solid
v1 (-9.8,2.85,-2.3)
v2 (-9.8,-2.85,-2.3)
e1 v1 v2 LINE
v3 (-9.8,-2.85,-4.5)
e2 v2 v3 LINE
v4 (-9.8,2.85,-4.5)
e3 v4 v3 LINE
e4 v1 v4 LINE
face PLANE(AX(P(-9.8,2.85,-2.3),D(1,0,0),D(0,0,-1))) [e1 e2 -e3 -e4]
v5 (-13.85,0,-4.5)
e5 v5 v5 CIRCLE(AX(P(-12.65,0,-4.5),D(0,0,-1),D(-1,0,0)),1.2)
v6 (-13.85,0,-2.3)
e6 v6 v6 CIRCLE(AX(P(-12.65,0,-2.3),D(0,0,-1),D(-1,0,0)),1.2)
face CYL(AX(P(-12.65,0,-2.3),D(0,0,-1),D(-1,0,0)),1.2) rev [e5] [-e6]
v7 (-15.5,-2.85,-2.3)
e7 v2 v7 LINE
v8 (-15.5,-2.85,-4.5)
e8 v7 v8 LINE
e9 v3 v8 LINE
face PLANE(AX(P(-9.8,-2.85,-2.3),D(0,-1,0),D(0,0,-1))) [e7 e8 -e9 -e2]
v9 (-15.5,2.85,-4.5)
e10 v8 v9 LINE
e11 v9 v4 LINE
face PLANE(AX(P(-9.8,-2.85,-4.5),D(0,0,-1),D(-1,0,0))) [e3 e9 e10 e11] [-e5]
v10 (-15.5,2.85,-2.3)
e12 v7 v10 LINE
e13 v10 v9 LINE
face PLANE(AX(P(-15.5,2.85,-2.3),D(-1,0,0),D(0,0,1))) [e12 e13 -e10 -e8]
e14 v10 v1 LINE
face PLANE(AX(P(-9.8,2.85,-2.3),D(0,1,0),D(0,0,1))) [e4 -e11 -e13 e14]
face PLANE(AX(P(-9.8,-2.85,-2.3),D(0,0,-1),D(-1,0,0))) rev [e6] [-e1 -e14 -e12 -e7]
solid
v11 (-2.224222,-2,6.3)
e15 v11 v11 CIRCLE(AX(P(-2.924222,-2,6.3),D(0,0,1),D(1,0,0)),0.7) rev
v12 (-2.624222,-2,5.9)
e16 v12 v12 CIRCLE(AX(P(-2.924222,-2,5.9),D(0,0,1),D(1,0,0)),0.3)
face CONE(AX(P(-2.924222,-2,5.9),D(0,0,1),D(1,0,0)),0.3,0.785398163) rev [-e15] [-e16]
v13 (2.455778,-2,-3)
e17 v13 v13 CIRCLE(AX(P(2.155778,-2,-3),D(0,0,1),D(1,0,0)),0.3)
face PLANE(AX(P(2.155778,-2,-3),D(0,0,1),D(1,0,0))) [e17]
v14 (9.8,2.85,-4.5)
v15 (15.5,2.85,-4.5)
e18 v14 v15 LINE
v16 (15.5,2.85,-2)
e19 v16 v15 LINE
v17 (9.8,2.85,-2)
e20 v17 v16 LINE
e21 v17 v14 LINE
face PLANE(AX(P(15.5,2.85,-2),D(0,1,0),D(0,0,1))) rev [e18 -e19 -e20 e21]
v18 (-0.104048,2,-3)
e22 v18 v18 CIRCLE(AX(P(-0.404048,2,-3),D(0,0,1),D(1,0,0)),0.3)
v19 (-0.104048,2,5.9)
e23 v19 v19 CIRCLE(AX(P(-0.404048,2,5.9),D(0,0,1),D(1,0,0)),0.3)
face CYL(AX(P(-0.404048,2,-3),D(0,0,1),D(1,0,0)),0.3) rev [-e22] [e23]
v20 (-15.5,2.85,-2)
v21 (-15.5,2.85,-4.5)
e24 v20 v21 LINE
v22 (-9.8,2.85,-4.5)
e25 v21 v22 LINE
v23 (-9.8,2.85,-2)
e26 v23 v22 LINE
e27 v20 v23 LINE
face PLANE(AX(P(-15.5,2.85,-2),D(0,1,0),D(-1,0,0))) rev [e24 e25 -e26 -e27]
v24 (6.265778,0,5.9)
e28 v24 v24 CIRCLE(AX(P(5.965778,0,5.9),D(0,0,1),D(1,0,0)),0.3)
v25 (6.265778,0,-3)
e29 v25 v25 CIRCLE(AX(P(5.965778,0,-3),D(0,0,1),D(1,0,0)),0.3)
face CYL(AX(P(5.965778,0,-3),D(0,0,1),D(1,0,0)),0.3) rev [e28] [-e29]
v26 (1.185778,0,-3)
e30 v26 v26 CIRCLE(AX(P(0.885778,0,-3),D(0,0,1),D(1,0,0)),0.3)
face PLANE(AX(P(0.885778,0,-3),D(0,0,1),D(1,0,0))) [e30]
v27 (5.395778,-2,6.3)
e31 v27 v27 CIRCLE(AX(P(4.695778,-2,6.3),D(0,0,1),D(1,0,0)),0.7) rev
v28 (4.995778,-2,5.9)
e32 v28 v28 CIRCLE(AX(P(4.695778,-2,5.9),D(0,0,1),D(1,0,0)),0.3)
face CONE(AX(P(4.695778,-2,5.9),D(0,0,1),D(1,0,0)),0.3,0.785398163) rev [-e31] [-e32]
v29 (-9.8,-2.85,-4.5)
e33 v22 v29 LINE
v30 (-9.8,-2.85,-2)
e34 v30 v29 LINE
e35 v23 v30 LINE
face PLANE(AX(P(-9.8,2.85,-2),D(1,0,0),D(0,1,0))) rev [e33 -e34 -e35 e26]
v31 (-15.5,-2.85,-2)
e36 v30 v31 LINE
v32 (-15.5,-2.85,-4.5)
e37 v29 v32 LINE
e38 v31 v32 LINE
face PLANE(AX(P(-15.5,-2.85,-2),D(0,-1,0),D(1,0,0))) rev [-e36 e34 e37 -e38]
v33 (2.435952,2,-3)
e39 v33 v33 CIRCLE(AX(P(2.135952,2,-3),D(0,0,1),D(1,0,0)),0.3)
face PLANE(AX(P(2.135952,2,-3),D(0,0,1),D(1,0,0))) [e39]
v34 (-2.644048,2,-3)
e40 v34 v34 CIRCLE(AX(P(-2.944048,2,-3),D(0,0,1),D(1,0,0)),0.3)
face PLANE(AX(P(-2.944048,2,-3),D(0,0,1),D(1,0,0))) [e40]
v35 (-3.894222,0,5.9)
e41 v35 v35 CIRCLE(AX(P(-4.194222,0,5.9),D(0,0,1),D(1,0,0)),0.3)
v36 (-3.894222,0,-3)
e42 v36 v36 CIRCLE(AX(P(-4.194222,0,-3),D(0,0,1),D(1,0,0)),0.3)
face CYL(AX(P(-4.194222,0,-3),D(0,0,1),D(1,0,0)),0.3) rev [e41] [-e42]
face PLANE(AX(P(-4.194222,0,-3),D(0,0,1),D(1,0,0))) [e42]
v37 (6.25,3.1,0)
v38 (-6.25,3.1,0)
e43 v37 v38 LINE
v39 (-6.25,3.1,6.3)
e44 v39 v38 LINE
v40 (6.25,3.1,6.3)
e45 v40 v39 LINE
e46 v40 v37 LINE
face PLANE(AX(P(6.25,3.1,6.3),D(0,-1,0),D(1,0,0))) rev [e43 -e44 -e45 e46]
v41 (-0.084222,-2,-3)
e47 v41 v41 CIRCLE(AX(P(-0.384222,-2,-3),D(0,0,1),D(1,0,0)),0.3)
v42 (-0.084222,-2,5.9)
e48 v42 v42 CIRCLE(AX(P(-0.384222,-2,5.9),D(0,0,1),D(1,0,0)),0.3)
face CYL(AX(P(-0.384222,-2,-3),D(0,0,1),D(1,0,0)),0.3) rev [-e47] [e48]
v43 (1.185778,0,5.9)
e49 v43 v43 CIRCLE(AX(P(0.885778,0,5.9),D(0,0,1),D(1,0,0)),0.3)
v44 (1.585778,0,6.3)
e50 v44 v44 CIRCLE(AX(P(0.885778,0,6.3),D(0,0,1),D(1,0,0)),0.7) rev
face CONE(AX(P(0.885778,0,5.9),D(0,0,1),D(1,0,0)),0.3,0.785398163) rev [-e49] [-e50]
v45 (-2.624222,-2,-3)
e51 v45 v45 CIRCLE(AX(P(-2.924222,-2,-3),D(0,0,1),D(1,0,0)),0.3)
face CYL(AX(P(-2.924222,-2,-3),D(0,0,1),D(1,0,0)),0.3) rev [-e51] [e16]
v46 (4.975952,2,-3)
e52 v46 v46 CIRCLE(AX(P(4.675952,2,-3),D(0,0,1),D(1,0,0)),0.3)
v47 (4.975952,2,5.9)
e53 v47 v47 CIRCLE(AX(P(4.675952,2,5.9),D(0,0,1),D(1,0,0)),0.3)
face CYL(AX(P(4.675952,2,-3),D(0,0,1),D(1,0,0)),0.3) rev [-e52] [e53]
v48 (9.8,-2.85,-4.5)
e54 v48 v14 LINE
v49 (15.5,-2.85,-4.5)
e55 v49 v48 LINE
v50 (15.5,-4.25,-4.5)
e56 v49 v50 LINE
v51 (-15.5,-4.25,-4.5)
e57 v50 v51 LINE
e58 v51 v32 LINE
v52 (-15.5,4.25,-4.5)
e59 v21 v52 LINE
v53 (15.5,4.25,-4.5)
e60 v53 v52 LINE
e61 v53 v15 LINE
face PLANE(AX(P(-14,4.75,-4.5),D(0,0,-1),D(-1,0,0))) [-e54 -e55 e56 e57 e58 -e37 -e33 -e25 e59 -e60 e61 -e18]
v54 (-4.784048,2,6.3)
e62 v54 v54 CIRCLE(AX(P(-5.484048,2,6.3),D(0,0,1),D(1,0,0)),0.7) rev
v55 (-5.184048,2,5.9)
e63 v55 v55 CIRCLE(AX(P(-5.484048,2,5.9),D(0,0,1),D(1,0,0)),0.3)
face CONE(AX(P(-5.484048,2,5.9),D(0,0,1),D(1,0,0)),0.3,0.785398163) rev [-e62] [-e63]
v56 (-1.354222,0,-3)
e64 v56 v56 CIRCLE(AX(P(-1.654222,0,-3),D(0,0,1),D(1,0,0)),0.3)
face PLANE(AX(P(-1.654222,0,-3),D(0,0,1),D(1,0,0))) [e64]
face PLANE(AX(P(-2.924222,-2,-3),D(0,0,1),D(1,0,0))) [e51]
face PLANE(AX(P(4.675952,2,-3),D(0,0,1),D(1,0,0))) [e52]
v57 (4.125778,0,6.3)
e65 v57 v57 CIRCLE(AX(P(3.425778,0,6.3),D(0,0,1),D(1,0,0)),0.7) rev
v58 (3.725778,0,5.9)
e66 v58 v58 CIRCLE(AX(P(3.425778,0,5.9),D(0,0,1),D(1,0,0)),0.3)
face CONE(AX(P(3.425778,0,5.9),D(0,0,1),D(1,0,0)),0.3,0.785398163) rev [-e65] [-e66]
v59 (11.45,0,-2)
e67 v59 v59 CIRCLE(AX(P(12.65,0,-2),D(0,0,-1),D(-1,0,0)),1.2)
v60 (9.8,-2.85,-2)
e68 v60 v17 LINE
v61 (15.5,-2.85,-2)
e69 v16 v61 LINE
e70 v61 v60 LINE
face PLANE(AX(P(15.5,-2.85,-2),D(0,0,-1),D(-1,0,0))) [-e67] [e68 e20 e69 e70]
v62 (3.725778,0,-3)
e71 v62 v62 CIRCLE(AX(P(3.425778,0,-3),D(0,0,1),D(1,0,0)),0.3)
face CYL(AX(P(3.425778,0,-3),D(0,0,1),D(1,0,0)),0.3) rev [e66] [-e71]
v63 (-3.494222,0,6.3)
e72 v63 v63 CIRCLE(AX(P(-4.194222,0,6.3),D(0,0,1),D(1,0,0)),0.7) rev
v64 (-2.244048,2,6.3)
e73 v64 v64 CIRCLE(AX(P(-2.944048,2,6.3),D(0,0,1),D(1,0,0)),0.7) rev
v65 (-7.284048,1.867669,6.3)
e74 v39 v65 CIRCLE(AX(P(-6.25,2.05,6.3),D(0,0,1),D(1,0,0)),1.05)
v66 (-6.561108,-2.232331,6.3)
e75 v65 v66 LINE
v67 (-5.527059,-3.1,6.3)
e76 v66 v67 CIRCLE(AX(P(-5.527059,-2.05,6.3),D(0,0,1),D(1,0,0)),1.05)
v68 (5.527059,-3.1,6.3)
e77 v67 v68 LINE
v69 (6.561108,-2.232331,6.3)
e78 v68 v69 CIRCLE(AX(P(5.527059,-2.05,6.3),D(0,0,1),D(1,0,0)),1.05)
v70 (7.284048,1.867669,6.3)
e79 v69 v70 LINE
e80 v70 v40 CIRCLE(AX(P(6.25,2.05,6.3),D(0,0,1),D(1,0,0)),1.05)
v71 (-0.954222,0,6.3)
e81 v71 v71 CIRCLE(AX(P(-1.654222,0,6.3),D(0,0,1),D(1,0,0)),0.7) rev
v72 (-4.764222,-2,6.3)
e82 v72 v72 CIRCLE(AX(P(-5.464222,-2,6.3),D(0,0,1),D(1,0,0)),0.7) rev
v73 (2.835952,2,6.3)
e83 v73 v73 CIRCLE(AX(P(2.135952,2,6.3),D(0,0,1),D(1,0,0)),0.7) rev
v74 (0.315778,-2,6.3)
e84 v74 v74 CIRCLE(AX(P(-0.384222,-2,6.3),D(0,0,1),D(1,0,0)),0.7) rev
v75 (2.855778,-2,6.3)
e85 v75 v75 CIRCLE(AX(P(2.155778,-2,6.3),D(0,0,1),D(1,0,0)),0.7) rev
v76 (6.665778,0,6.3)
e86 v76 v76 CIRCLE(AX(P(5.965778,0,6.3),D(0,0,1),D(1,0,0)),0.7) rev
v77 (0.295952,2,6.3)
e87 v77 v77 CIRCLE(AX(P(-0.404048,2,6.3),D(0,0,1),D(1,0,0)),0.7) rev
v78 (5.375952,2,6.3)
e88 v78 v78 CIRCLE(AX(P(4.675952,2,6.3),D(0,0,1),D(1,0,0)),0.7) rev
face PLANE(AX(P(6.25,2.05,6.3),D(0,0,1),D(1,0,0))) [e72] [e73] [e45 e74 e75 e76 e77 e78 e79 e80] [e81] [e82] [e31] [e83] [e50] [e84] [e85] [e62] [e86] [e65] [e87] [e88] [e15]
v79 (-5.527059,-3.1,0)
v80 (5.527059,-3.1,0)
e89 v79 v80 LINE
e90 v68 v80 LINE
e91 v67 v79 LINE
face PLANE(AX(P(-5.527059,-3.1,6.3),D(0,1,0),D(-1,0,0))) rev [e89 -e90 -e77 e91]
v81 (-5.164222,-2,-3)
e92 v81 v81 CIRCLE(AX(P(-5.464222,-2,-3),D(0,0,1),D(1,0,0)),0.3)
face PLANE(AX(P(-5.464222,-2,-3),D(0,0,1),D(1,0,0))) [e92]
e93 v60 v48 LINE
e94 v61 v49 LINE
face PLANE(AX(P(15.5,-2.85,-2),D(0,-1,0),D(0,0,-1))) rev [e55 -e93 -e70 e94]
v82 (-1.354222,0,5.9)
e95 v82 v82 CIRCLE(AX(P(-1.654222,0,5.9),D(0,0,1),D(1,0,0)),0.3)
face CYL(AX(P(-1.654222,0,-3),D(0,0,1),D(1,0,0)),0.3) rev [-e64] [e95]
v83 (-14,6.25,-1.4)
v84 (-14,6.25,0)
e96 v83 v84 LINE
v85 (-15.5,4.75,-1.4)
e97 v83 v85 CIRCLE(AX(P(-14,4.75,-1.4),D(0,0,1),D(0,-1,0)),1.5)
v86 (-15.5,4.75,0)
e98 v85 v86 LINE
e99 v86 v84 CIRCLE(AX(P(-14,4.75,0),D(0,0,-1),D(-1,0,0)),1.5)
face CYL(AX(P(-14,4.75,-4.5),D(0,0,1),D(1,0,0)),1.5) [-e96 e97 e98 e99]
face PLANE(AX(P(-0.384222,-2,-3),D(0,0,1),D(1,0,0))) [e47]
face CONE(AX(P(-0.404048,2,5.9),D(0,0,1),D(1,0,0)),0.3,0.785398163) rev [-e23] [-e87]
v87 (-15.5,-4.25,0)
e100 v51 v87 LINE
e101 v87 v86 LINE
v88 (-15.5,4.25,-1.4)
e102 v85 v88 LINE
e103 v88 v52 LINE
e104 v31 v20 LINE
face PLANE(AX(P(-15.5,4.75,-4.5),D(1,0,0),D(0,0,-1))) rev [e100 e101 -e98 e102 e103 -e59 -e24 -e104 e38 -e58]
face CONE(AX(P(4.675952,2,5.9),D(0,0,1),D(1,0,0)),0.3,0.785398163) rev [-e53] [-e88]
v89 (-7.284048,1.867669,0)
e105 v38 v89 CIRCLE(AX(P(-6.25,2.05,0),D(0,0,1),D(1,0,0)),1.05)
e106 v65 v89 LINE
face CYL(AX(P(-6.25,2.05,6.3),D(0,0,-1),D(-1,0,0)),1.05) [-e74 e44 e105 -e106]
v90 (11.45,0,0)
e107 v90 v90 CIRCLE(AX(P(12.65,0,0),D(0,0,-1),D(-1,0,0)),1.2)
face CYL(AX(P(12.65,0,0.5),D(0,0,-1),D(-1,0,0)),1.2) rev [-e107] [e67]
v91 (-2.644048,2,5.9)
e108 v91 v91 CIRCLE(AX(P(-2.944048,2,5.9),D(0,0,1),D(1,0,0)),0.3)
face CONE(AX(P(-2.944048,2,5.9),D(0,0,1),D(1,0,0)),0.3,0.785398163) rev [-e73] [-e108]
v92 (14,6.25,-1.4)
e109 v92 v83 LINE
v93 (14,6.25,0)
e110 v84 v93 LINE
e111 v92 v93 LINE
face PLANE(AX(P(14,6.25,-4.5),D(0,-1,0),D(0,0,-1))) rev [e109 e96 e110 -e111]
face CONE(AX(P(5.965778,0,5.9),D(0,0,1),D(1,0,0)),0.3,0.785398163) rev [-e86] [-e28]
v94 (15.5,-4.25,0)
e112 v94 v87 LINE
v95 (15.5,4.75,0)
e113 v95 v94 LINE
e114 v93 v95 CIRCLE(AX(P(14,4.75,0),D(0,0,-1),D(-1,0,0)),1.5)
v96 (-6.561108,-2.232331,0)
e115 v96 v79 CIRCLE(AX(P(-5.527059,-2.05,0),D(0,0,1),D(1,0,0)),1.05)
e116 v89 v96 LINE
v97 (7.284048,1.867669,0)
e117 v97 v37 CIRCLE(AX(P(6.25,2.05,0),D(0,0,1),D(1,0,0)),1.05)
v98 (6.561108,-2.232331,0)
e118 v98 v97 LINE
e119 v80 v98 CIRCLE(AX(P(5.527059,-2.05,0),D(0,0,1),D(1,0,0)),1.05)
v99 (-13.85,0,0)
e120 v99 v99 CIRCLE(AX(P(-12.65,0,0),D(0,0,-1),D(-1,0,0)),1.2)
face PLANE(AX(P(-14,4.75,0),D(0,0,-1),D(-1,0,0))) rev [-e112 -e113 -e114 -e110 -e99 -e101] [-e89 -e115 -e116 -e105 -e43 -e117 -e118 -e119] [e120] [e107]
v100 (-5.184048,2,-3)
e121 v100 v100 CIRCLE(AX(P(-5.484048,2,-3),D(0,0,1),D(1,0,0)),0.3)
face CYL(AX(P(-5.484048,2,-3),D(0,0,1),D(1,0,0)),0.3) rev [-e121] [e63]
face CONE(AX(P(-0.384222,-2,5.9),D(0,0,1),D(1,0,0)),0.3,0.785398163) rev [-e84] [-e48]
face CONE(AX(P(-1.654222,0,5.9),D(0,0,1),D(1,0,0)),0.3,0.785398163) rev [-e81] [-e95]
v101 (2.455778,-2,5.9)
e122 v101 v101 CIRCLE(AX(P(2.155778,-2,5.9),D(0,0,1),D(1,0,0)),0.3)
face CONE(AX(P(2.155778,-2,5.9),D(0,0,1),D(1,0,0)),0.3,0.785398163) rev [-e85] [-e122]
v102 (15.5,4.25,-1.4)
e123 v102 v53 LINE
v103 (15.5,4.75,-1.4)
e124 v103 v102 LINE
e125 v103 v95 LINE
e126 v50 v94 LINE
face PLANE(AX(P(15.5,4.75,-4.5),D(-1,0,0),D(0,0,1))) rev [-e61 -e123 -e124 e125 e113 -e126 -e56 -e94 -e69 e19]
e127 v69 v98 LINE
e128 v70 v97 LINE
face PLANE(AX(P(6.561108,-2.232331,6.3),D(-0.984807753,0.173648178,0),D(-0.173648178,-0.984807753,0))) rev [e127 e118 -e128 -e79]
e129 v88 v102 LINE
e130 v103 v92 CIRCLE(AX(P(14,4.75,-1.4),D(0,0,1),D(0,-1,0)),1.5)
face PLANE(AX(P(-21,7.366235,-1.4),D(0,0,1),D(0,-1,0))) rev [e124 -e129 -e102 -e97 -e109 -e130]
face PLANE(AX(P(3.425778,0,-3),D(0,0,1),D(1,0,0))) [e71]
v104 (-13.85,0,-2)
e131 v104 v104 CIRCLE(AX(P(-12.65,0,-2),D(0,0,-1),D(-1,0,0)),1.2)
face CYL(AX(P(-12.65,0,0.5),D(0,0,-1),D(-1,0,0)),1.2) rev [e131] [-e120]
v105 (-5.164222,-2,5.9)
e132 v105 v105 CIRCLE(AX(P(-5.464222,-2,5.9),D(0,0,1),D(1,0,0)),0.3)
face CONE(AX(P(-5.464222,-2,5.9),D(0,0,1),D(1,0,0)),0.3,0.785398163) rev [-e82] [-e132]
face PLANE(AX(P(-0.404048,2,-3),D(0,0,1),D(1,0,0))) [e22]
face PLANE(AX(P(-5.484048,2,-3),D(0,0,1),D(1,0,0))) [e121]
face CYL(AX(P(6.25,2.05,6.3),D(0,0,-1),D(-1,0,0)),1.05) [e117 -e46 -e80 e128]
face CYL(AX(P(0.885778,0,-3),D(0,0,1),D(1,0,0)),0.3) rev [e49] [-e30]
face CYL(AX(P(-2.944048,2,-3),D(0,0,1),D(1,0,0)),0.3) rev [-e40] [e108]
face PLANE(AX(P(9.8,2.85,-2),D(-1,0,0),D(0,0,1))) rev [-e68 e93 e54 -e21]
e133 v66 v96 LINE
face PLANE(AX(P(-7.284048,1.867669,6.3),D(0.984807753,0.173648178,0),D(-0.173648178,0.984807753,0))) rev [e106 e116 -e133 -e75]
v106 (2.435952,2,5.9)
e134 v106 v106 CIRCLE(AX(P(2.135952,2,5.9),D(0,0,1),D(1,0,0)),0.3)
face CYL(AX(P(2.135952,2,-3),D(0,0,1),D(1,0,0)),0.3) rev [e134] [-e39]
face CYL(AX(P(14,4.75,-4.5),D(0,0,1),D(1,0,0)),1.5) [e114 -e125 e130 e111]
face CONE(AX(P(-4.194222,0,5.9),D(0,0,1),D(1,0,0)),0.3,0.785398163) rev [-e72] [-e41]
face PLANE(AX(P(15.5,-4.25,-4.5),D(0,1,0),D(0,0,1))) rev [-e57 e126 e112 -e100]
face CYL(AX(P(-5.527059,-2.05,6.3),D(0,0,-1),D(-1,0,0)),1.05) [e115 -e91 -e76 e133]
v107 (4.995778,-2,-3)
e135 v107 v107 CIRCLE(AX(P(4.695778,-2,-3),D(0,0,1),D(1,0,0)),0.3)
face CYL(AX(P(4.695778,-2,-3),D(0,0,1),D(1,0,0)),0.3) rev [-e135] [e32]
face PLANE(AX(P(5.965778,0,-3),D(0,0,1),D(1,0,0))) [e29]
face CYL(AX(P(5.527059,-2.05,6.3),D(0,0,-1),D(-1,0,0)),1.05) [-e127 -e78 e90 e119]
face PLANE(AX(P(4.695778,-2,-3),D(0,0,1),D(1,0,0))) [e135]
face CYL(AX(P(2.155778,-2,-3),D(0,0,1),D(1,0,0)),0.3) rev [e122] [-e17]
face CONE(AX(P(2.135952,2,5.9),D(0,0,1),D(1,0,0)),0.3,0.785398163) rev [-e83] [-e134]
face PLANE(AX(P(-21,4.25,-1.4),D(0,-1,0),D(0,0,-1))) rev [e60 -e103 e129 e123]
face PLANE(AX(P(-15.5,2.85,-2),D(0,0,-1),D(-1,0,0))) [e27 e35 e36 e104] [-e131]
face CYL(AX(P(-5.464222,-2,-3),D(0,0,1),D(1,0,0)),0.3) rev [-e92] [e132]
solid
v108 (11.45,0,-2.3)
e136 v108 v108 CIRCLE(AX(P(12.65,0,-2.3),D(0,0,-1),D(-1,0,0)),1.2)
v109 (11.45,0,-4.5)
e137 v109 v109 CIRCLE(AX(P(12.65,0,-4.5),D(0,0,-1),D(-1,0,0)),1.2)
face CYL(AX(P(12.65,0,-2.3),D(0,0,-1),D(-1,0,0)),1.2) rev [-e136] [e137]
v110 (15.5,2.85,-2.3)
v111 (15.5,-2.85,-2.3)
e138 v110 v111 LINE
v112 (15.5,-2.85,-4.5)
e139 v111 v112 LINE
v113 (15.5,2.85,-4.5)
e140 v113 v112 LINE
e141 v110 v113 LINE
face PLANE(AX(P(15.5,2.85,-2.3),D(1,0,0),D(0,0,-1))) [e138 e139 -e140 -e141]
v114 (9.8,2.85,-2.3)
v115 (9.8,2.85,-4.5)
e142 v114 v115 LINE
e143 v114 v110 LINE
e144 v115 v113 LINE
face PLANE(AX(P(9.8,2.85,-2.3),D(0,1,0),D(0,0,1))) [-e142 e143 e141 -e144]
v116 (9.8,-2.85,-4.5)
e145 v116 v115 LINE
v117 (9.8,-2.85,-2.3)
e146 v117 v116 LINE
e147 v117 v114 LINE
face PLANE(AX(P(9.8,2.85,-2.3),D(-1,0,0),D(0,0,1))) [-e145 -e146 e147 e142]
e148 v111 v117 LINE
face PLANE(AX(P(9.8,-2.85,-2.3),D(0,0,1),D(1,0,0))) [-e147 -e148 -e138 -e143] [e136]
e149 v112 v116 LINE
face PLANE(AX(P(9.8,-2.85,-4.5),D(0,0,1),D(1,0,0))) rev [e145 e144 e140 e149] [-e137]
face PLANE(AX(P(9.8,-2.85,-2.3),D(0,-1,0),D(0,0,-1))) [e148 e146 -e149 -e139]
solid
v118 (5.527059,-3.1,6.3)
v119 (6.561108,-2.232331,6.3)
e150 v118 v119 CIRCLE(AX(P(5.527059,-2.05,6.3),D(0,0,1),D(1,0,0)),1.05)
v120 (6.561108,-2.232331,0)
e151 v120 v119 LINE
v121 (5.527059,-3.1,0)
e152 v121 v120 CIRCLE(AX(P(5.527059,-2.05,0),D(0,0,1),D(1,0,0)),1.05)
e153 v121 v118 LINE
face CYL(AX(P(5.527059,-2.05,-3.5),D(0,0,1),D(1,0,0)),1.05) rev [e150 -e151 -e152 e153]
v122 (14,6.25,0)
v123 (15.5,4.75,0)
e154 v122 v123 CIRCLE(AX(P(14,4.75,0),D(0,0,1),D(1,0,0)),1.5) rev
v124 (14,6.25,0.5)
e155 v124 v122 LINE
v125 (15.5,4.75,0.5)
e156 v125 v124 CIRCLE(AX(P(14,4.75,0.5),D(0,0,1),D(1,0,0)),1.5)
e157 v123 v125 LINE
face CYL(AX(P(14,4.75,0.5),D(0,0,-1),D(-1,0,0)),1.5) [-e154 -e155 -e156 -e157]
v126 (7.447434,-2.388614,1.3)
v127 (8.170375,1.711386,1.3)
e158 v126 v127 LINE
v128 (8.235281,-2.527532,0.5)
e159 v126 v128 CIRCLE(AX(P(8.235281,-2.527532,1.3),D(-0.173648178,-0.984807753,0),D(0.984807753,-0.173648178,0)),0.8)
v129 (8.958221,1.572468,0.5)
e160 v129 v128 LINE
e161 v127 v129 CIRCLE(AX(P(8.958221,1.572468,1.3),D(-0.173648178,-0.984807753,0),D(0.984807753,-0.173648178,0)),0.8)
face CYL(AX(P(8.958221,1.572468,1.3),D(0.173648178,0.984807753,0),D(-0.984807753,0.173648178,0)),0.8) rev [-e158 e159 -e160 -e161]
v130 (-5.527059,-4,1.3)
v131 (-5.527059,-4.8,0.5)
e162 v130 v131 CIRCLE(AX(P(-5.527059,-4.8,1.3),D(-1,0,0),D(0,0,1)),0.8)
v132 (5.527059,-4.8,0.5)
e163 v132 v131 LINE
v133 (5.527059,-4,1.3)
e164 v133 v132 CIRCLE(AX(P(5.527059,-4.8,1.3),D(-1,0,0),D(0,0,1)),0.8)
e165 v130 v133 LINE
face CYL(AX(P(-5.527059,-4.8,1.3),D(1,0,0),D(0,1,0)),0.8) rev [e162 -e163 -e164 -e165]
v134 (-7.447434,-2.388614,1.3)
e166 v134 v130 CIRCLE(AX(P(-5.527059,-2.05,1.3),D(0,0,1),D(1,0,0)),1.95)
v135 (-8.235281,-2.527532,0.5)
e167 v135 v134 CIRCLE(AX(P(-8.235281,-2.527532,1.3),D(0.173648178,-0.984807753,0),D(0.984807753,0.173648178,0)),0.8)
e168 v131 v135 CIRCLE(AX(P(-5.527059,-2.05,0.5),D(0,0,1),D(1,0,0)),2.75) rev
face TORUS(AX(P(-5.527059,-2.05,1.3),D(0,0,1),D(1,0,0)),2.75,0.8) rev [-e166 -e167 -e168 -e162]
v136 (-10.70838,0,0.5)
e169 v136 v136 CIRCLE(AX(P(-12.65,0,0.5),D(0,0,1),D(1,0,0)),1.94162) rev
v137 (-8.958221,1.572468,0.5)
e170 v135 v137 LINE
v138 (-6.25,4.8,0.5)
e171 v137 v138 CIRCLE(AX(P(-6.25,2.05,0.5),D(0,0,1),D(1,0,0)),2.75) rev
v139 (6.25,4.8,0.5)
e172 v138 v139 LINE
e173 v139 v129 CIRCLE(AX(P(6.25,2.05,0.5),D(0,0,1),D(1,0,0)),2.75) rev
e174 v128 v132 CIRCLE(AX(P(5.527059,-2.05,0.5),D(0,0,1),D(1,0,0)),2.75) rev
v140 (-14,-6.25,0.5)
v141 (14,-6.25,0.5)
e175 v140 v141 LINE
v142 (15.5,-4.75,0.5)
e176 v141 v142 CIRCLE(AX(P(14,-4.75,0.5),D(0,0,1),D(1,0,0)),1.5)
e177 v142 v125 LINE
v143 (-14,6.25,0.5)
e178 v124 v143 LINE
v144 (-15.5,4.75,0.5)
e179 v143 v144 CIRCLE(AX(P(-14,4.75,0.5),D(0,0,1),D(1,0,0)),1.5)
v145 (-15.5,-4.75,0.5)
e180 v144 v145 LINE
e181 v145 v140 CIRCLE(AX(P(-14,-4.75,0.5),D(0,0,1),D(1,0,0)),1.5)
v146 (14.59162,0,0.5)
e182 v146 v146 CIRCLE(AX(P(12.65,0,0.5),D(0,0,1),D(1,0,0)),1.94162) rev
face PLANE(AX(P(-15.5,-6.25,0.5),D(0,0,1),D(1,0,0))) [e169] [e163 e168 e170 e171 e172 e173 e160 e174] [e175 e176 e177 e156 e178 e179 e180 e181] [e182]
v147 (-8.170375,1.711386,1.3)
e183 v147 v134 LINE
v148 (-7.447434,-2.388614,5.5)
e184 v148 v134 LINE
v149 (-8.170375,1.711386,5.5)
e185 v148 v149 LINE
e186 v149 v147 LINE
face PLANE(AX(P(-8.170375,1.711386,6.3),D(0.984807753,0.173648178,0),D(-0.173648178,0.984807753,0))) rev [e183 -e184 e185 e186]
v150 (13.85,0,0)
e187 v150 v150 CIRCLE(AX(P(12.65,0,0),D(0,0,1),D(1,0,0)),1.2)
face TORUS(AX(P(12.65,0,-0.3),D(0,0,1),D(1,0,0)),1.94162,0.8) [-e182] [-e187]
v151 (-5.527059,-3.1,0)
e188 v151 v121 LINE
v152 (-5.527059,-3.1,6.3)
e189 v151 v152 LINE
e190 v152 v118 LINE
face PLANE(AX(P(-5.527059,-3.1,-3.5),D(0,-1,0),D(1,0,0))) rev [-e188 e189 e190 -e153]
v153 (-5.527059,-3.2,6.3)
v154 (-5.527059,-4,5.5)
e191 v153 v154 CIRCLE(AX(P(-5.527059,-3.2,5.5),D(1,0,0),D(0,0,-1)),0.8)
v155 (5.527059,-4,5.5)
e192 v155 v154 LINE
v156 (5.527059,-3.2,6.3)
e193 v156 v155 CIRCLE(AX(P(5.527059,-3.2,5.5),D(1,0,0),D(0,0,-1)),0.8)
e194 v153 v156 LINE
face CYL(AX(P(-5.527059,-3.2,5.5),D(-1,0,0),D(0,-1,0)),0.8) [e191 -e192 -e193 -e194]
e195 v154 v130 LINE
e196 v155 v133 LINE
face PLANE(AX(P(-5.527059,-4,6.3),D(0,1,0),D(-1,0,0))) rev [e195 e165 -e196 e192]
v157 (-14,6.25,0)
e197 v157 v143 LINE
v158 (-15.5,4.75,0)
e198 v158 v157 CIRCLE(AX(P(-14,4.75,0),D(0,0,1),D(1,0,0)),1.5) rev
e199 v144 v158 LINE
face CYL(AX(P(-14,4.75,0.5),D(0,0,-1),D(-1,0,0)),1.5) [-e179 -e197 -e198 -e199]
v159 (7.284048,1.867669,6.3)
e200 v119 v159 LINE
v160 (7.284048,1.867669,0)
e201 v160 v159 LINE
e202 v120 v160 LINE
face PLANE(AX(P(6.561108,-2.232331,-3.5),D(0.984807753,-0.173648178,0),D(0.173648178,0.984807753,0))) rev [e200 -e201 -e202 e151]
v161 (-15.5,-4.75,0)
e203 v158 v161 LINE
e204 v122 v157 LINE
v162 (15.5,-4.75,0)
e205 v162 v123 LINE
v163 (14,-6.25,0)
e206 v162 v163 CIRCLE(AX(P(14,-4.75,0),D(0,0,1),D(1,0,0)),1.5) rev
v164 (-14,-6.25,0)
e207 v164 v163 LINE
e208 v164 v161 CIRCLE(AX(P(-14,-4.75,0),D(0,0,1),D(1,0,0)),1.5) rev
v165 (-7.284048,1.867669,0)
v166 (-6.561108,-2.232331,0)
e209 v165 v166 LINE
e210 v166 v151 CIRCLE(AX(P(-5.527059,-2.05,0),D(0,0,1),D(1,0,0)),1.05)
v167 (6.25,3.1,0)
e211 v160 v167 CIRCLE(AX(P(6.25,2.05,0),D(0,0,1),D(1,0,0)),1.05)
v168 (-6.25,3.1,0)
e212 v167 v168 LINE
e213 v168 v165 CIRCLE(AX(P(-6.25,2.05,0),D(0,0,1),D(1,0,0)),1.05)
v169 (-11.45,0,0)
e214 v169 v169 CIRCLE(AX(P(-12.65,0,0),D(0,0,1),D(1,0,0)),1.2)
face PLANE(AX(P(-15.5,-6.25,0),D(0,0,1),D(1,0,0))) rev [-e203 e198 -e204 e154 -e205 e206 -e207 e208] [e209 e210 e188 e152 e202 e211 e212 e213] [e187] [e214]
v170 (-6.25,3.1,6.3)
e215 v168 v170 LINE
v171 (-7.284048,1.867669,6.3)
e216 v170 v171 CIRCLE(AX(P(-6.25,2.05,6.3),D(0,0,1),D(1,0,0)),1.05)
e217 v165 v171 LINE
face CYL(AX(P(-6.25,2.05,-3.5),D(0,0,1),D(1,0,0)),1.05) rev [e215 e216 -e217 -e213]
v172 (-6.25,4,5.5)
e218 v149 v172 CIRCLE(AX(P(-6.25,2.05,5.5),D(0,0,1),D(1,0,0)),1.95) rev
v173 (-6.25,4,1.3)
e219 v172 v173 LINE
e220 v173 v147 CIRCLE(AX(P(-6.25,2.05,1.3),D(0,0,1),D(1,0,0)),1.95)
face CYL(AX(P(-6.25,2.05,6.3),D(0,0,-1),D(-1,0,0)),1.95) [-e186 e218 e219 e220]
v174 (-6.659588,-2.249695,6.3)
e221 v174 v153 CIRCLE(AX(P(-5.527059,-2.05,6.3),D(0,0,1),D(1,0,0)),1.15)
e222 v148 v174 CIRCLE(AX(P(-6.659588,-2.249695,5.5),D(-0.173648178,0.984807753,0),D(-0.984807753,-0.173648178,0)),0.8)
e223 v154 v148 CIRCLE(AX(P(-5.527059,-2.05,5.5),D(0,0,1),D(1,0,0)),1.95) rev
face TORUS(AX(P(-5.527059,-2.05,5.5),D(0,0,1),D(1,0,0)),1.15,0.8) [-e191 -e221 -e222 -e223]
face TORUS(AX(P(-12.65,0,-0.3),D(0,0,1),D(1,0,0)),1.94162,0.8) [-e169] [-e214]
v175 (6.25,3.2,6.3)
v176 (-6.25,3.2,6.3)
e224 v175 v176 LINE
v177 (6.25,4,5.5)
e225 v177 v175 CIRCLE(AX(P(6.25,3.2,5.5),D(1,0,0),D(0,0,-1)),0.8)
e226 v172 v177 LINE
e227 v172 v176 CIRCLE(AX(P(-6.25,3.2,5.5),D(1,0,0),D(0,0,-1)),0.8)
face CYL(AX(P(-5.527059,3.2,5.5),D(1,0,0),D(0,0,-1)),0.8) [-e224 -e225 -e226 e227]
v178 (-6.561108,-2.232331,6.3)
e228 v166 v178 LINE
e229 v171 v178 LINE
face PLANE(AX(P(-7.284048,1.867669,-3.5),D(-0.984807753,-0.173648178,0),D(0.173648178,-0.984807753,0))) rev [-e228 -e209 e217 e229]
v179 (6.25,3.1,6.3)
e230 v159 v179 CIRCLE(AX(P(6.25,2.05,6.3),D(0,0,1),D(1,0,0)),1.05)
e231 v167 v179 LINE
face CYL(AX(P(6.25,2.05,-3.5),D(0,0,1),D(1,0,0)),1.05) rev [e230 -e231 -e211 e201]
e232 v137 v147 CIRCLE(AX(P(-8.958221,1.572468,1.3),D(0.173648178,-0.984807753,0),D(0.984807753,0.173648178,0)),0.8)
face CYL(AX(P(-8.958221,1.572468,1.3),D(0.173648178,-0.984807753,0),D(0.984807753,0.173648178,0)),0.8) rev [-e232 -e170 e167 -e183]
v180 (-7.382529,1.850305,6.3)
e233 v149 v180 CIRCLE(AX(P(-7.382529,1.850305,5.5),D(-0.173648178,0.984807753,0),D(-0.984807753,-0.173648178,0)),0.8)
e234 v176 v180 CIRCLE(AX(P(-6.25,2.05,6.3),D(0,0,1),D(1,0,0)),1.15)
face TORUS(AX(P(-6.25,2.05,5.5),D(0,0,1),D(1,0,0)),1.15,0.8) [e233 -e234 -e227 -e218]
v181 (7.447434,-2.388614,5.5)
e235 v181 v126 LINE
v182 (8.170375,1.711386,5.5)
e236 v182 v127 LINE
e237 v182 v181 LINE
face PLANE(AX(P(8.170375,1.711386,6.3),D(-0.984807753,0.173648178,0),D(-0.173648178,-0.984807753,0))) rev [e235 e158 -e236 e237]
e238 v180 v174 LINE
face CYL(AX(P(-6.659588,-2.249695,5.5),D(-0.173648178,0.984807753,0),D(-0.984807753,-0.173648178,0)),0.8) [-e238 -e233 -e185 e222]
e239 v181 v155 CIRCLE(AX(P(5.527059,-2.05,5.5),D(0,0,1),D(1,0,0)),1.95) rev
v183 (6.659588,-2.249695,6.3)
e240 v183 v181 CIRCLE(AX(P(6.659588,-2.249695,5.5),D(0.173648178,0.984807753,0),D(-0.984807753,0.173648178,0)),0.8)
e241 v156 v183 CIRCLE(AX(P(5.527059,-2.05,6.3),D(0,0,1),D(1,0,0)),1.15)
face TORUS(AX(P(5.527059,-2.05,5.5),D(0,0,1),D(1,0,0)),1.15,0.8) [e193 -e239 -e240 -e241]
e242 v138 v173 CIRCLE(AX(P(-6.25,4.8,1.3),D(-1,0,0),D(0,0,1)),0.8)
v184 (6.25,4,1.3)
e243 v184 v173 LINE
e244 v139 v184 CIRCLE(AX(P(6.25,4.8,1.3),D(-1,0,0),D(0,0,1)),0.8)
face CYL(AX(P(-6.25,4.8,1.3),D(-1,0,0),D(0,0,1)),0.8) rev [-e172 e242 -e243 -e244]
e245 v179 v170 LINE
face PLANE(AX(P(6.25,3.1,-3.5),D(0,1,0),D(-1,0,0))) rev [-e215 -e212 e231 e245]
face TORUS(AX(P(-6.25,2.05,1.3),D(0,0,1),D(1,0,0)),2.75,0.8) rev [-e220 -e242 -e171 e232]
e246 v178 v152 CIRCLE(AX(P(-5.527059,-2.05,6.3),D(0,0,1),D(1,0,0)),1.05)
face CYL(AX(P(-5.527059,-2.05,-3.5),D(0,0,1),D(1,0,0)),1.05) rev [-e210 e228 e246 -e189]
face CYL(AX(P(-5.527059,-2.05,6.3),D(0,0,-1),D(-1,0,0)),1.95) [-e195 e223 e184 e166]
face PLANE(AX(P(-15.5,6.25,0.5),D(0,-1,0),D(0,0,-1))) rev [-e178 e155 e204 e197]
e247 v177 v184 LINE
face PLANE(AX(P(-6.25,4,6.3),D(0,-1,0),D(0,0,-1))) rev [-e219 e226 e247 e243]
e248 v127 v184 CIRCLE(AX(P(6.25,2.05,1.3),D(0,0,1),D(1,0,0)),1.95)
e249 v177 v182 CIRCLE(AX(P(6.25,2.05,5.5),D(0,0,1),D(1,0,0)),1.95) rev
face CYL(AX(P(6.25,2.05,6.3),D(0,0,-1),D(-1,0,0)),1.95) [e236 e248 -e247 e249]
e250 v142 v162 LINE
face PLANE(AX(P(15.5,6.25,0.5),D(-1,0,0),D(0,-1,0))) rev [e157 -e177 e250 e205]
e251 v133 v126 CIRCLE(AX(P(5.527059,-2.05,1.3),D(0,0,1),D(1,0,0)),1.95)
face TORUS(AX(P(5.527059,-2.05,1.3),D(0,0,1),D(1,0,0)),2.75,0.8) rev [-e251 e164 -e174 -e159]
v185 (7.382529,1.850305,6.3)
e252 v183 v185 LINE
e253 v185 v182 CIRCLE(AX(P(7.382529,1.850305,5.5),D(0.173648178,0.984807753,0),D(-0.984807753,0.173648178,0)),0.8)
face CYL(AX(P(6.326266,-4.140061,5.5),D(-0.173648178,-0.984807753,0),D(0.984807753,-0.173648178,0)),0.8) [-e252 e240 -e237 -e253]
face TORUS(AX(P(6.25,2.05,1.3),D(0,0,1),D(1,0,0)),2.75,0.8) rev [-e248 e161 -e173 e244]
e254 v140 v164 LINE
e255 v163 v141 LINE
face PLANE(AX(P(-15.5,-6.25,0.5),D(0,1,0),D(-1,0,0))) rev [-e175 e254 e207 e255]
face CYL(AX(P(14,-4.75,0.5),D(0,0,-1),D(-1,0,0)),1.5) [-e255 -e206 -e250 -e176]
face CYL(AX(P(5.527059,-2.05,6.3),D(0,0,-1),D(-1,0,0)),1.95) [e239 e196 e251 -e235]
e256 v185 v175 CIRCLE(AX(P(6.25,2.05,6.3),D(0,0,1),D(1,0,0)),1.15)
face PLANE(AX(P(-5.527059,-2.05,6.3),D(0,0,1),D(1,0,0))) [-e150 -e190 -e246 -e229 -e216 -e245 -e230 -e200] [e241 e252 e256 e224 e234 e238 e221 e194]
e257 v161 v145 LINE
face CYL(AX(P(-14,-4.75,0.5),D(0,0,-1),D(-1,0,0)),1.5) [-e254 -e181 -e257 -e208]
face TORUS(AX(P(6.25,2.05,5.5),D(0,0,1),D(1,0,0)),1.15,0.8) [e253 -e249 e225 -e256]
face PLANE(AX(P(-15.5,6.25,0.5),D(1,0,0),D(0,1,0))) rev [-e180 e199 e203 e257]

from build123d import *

# Parameters (mm, degrees)
CROQUIS1_W            = 31
CROQUIS1_H            = 12.5
EXTRUIR1_DEPTH        = 0.5
REDONDEO1_R           = 1.5
EXTRUIR2_DEPTH        = 5.8
CORTAR_EXTRUIR1_DEPTH = 9.8
REDONDEO2_R           = 0.8
REDONDEO3_R           = 0.8
CROQUIS4_R            = 1.2
CORTAR_EXTRUIR2_DEPTH = 9.8
REDONDEO4_R           = 0.8
EXTRUIR3_DEPTH        = 4.5
CROQUIS6_W            = 4.094383516
CROQUIS6_H            = 3.116234629
CORTAR_EXTRUIR3_DEPTH = 36.5
CROQUIS7_W            = 5.7
CROQUIS7_H            = 5.7
CORTAR_EXTRUIR4_DEPTH = 2.5
CROQUIS8_R            = 1.2
CORTAR_EXTRUIR5_DEPTH = 2.5
EXTRUIR4_DEPTH        = 6.3
CROQUIS10_R           = 0.3
CORTAR_EXTRUIR6_DEPTH = 9.3
CHAFL_N1_SIZE         = 0.4
CROQUIS11_W           = 5.7
CROQUIS11_H           = 5.7
CROQUIS11_R           = 1.2
EXTRUIR5_DEPTH        = 2.2
EXTRUIR5_2_DEPTH      = 2.2


with BuildPart() as part:
    # Croquis1 → Extruir1 (new body)
    with BuildSketch(Plane.XY):
        Rectangle(CROQUIS1_W, CROQUIS1_H)
    extrude(amount=EXTRUIR1_DEPTH)

    # Redondeo1
    redondeo1_edges = [part.edges().sort_by_distance(p)[0] for p in [
        (-15.5, 6.25, 0.25),
        (15.5, 6.25, 0.25),
        (15.5, -6.25, 0.25),
        (-15.5, -6.25, 0.25),
    ]]
    fillet(redondeo1_edges, radius=REDONDEO1_R)

    # Croquis2 → Extruir2 (add)
    with BuildSketch(Plane.XY.offset(0.5)):
        with BuildLine():
            Line((-6.25, 4), (6.25, 4))
            ThreePointArc((6.25, 4), (7.743786664, 3.303435839), (8.170375118, 1.711386054))
            Line((8.170375118, 1.711386054), (7.447434497, -2.388613946))
            ThreePointArc((7.447434497, -2.388613946), (6.780495218, -3.543786664), (5.527059379, -4))
            Line((5.527059379, -4), (-5.527059379, -4))
            ThreePointArc((-5.527059379, -4), (-6.780495218, -3.543786664), (-7.447434497, -2.388613946))
            Line((-7.447434497, -2.388613946), (-8.170375118, 1.711386054))
            ThreePointArc((-8.170375118, 1.711386054), (-7.743786664, 3.303435839), (-6.25, 4))
        make_face()
    extrude(amount=EXTRUIR2_DEPTH)

    # Croquis3 → Cortar-Extruir1 (cut)
    with BuildSketch(Plane.XY.offset(6.3)):
        with BuildLine():
            Line((-5.527059379, -3.1), (5.527059379, -3.1))
            ThreePointArc((5.527059379, -3.1), (6.201986369, -2.854346665), (6.56110752, -2.232330587))
            Line((6.56110752, -2.232330587), (7.284048141, 1.867669413))
            ThreePointArc((7.284048141, 1.867669413), (7.054346665, 2.72492699), (6.25, 3.1))
            Line((6.25, 3.1), (-6.25, 3.1))
            ThreePointArc((-6.25, 3.1), (-7.054346665, 2.72492699), (-7.284048141, 1.867669413))
            Line((-7.284048141, 1.867669413), (-6.56110752, -2.232330587))
            ThreePointArc((-6.56110752, -2.232330587), (-6.201986369, -2.854346665), (-5.527059379, -3.1))
        make_face()
    extrude(amount=-CORTAR_EXTRUIR1_DEPTH, mode=Mode.SUBTRACT)

    # Redondeo2
    redondeo2_edges = [part.edges().sort_by_distance(p)[0] for p in [
        (-6.780495218, -3.543786664, 6.3),
        (0, -4, 6.3),
        (6.780495218, -3.543786664, 6.3),
        (7.808904808, -0.338613946, 6.3),
        (7.743786664, 3.303435839, 6.3),
        (0, 4, 6.3),
        (-7.743786664, 3.303435839, 6.3),
        (-7.808904808, -0.338613946, 6.3),
    ]]
    fillet(redondeo2_edges, radius=REDONDEO2_R)

    # Redondeo3
    redondeo3_edges = [part.edges().sort_by_distance(p)[0] for p in [
        (-6.780495218, -3.543786664, 0.5),
        (0, -4, 0.5),
        (6.780495218, -3.543786664, 0.5),
        (7.808904808, -0.338613946, 0.5),
        (7.743786664, 3.303435839, 0.5),
        (0, 4, 0.5),
        (-7.743786664, 3.303435839, 0.5),
        (-7.808904808, -0.338613946, 0.5),
    ]]
    fillet(redondeo3_edges, radius=REDONDEO3_R)

    # Croquis4 → Cortar-Extruir2 (cut)
    with BuildSketch(Plane.XY.offset(0.5)):
        with Locations((12.65, 0)):
            Circle(CROQUIS4_R)
        with Locations((-12.65, 0)):
            Circle(CROQUIS4_R)
    extrude(amount=-CORTAR_EXTRUIR2_DEPTH, mode=Mode.SUBTRACT)

    # Redondeo4
    # the kernel refuses this fillet: 0.8 mm, written as the material it takes off along each edge
    with BuildSketch(Plane(origin=(12.65, 0, 0.5), x_dir=(1, 0, 0), z_dir=(0, -1, 0))) as redondeo4_piece_1:
        with BuildLine():
            CenterArc((1.941619849, -0.8), REDONDEO4_R, 90, 67.975687163)
            Line((1.2, -0.5), (1.185167603, -0.494))
            ThreePointArc((1.185167603, -0.494), (1.184, -0.25), (1.184, 0))
            Line((1.184, 0), (1.2, 0.016))
            Line((1.2, 0.016), (1.941619849, 0.016))
            Line((1.941619849, 0.016), (1.941619849, 0))
        make_face()
    revolve(axis=Axis((12.65, 0, 0.5), (0, 0, 1)), mode=Mode.SUBTRACT)
    with BuildSketch(Plane(origin=(-12.65, 0, 0.5), x_dir=(1, 0, 0), z_dir=(0, -1, 0))) as redondeo4_piece_2:
        with BuildLine():
            CenterArc((1.941619849, -0.8), REDONDEO4_R, 90, 67.975687163)
            Line((1.2, -0.5), (1.185167603, -0.494))
            ThreePointArc((1.185167603, -0.494), (1.184, -0.25), (1.184, 0))
            Line((1.184, 0), (1.2, 0.016))
            Line((1.2, 0.016), (1.941619849, 0.016))
            Line((1.941619849, 0.016), (1.941619849, 0))
        make_face()
    revolve(axis=Axis((-12.65, 0, 0.5), (0, 0, 1)), mode=Mode.SUBTRACT)


with BuildPart() as body_2:
    # Croquis5 → Extruir3 (new body)
    with BuildSketch(Plane(origin=(0, 0, 0), x_dir=(-1, 0, 0), z_dir=(0, 0, -1))):
        with BuildLine():
            Line((-14, 6.25), (14, 6.25))
            ThreePointArc((14, 6.25), (15.060660172, 5.810660172), (15.5, 4.75))
            Line((15.5, 4.75), (15.5, -4.25))
            Line((15.5, -4.25), (-15.5, -4.25))
            Line((-15.5, -4.25), (-15.5, 4.75))
            ThreePointArc((-15.5, 4.75), (-15.060660172, 5.810660172), (-14, 6.25))
        make_face()
    extrude(amount=EXTRUIR3_DEPTH)

    # Croquis6 → Cortar-Extruir3 (cut)
    with BuildSketch(Plane(origin=(15.5, 0, 0), x_dir=(0, 0, -1), z_dir=(1, 0, 0))):
        with Locations((3.447191758, 5.808117315)):
            Rectangle(CROQUIS6_W, CROQUIS6_H)
    extrude(amount=-CORTAR_EXTRUIR3_DEPTH, mode=Mode.SUBTRACT)

    # Croquis7 → Cortar-Extruir4 (cut)
    with BuildSketch(Plane(origin=(0, 0, -4.5), x_dir=(-1, 0, 0), z_dir=(0, 0, -1))):
        with Locations((-12.65, 0)):
            Rectangle(CROQUIS7_W, CROQUIS7_H)
        with Locations((12.65, 0)):
            Rectangle(CROQUIS7_W, CROQUIS7_H)
    extrude(amount=-CORTAR_EXTRUIR4_DEPTH, mode=Mode.SUBTRACT)

    # Croquis8 → Cortar-Extruir5 (cut)
    with BuildSketch(Plane(origin=(0, 0, -2), x_dir=(-1, 0, 0), z_dir=(0, 0, -1))):
        with Locations((-12.65, 0)):
            Circle(CROQUIS8_R)
        with Locations((12.65, 0)):
            Circle(CROQUIS8_R)
    extrude(amount=-CORTAR_EXTRUIR5_DEPTH, mode=Mode.SUBTRACT)


with BuildPart() as body_3:
    # Croquis9 → Extruir4 (new body)
    with BuildSketch(Plane.XY):
        with BuildLine():
            Line((6.56110752, -2.232330587), (7.284048141, 1.867669413))
            ThreePointArc((7.284048141, 1.867669413), (7.054346665, 2.72492699), (6.25, 3.1))
            Line((6.25, 3.1), (-6.25, 3.1))
            ThreePointArc((-6.25, 3.1), (-7.054346665, 2.72492699), (-7.284048141, 1.867669413))
            Line((-7.284048141, 1.867669413), (-6.56110752, -2.232330587))
            ThreePointArc((-6.56110752, -2.232330587), (-6.201986369, -2.854346665), (-5.527059379, -3.1))
            Line((-5.527059379, -3.1), (5.527059379, -3.1))
            ThreePointArc((5.527059379, -3.1), (6.201986369, -2.854346665), (6.56110752, -2.232330587))
        make_face()
    extrude(amount=EXTRUIR4_DEPTH)


with BuildPart() as cortar_extruir6_tool:
    # Croquis10 → Cortar-Extruir6 (new body)
    with BuildSketch(Plane.XY.offset(6.3)):
        with Locations((-5.484048141, 2)):
            Circle(CROQUIS10_R)
        with Locations((-2.944048141, 2)):
            Circle(CROQUIS10_R)
        with Locations((-0.404048141, 2)):
            Circle(CROQUIS10_R)
        with Locations((2.135951859, 2)):
            Circle(CROQUIS10_R)
        with Locations((4.675951859, 2)):
            Circle(CROQUIS10_R)
        with Locations((4.695777882, -2)):
            Circle(CROQUIS10_R)
        with Locations((2.155777882, -2)):
            Circle(CROQUIS10_R)
        with Locations((-0.384222118, -2)):
            Circle(CROQUIS10_R)
        with Locations((-2.924222118, -2)):
            Circle(CROQUIS10_R)
        with Locations((-5.464222118, -2)):
            Circle(CROQUIS10_R)
        with Locations((0.885777882, 0)):
            Circle(CROQUIS10_R)
        with Locations((3.425777882, 0)):
            Circle(CROQUIS10_R)
        with Locations((5.965777882, 0)):
            Circle(CROQUIS10_R)
        with Locations((-1.654222118, 0)):
            Circle(CROQUIS10_R)
        with Locations((-4.194222118, 0)):
            Circle(CROQUIS10_R)
    extrude(amount=-CORTAR_EXTRUIR6_DEPTH)


with BuildPart() as body_2_1:
    add(body_2.part)

    # Cortar-Extruir6: cut by cortar_extruir6_tool
    add(cortar_extruir6_tool.part, mode=Mode.SUBTRACT)


with BuildPart() as body_3_1:
    add(body_3.part)

    # Cortar-Extruir6: cut by cortar_extruir6_tool
    add(cortar_extruir6_tool.part, mode=Mode.SUBTRACT)

    # Chaflán1
    chafl_n1_edges = [body_3_1.edges().sort_by_distance(p)[0] for p in [
        (-5.784048141, 2, 6.3),
        (-3.244048141, 2, 6.3),
        (-0.704048141, 2, 6.3),
        (1.835951859, 2, 6.3),
        (4.375951859, 2, 6.3),
        (-5.764222118, -2, 6.3),
        (-3.224222118, -2, 6.3),
        (-0.684222118, -2, 6.3),
        (1.855777882, -2, 6.3),
        (4.395777882, -2, 6.3),
        (-4.494222118, 0, 6.3),
        (-1.954222118, 0, 6.3),
        (0.585777882, 0, 6.3),
        (3.125777882, 0, 6.3),
        (5.665777882, 0, 6.3),
    ]]
    chamfer(chafl_n1_edges, length=CHAFL_N1_SIZE)

    # Combinar1: union body 2
    add(body_2_1.part)


with BuildPart() as body_3_2:
    # Croquis11 → Extruir5 (new body)
    with BuildSketch(Plane(origin=(0, 0, -4.5), x_dir=(-1, 0, 0), z_dir=(0, 0, -1))):
        with Locations((-12.65, 0)):
            Rectangle(CROQUIS11_W, CROQUIS11_H)
        with Locations((-12.65, 0)):
            Circle(CROQUIS11_R, mode=Mode.SUBTRACT)
    extrude(amount=-EXTRUIR5_DEPTH)


with BuildPart() as body_4:
    # Croquis11 → Extruir5 2 (new body)
    with BuildSketch(Plane(origin=(0, 0, -4.5), x_dir=(-1, 0, 0), z_dir=(0, 0, -1))):
        with Locations((12.65, 0)):
            Rectangle(CROQUIS11_W, CROQUIS11_H)
        with Locations((12.65, 0)):
            Circle(CROQUIS11_R, mode=Mode.SUBTRACT)
    extrude(amount=-EXTRUIR5_2_DEPTH)


solid = Compound([part.part, body_3_1.part, body_3_2.part, body_4.part])
